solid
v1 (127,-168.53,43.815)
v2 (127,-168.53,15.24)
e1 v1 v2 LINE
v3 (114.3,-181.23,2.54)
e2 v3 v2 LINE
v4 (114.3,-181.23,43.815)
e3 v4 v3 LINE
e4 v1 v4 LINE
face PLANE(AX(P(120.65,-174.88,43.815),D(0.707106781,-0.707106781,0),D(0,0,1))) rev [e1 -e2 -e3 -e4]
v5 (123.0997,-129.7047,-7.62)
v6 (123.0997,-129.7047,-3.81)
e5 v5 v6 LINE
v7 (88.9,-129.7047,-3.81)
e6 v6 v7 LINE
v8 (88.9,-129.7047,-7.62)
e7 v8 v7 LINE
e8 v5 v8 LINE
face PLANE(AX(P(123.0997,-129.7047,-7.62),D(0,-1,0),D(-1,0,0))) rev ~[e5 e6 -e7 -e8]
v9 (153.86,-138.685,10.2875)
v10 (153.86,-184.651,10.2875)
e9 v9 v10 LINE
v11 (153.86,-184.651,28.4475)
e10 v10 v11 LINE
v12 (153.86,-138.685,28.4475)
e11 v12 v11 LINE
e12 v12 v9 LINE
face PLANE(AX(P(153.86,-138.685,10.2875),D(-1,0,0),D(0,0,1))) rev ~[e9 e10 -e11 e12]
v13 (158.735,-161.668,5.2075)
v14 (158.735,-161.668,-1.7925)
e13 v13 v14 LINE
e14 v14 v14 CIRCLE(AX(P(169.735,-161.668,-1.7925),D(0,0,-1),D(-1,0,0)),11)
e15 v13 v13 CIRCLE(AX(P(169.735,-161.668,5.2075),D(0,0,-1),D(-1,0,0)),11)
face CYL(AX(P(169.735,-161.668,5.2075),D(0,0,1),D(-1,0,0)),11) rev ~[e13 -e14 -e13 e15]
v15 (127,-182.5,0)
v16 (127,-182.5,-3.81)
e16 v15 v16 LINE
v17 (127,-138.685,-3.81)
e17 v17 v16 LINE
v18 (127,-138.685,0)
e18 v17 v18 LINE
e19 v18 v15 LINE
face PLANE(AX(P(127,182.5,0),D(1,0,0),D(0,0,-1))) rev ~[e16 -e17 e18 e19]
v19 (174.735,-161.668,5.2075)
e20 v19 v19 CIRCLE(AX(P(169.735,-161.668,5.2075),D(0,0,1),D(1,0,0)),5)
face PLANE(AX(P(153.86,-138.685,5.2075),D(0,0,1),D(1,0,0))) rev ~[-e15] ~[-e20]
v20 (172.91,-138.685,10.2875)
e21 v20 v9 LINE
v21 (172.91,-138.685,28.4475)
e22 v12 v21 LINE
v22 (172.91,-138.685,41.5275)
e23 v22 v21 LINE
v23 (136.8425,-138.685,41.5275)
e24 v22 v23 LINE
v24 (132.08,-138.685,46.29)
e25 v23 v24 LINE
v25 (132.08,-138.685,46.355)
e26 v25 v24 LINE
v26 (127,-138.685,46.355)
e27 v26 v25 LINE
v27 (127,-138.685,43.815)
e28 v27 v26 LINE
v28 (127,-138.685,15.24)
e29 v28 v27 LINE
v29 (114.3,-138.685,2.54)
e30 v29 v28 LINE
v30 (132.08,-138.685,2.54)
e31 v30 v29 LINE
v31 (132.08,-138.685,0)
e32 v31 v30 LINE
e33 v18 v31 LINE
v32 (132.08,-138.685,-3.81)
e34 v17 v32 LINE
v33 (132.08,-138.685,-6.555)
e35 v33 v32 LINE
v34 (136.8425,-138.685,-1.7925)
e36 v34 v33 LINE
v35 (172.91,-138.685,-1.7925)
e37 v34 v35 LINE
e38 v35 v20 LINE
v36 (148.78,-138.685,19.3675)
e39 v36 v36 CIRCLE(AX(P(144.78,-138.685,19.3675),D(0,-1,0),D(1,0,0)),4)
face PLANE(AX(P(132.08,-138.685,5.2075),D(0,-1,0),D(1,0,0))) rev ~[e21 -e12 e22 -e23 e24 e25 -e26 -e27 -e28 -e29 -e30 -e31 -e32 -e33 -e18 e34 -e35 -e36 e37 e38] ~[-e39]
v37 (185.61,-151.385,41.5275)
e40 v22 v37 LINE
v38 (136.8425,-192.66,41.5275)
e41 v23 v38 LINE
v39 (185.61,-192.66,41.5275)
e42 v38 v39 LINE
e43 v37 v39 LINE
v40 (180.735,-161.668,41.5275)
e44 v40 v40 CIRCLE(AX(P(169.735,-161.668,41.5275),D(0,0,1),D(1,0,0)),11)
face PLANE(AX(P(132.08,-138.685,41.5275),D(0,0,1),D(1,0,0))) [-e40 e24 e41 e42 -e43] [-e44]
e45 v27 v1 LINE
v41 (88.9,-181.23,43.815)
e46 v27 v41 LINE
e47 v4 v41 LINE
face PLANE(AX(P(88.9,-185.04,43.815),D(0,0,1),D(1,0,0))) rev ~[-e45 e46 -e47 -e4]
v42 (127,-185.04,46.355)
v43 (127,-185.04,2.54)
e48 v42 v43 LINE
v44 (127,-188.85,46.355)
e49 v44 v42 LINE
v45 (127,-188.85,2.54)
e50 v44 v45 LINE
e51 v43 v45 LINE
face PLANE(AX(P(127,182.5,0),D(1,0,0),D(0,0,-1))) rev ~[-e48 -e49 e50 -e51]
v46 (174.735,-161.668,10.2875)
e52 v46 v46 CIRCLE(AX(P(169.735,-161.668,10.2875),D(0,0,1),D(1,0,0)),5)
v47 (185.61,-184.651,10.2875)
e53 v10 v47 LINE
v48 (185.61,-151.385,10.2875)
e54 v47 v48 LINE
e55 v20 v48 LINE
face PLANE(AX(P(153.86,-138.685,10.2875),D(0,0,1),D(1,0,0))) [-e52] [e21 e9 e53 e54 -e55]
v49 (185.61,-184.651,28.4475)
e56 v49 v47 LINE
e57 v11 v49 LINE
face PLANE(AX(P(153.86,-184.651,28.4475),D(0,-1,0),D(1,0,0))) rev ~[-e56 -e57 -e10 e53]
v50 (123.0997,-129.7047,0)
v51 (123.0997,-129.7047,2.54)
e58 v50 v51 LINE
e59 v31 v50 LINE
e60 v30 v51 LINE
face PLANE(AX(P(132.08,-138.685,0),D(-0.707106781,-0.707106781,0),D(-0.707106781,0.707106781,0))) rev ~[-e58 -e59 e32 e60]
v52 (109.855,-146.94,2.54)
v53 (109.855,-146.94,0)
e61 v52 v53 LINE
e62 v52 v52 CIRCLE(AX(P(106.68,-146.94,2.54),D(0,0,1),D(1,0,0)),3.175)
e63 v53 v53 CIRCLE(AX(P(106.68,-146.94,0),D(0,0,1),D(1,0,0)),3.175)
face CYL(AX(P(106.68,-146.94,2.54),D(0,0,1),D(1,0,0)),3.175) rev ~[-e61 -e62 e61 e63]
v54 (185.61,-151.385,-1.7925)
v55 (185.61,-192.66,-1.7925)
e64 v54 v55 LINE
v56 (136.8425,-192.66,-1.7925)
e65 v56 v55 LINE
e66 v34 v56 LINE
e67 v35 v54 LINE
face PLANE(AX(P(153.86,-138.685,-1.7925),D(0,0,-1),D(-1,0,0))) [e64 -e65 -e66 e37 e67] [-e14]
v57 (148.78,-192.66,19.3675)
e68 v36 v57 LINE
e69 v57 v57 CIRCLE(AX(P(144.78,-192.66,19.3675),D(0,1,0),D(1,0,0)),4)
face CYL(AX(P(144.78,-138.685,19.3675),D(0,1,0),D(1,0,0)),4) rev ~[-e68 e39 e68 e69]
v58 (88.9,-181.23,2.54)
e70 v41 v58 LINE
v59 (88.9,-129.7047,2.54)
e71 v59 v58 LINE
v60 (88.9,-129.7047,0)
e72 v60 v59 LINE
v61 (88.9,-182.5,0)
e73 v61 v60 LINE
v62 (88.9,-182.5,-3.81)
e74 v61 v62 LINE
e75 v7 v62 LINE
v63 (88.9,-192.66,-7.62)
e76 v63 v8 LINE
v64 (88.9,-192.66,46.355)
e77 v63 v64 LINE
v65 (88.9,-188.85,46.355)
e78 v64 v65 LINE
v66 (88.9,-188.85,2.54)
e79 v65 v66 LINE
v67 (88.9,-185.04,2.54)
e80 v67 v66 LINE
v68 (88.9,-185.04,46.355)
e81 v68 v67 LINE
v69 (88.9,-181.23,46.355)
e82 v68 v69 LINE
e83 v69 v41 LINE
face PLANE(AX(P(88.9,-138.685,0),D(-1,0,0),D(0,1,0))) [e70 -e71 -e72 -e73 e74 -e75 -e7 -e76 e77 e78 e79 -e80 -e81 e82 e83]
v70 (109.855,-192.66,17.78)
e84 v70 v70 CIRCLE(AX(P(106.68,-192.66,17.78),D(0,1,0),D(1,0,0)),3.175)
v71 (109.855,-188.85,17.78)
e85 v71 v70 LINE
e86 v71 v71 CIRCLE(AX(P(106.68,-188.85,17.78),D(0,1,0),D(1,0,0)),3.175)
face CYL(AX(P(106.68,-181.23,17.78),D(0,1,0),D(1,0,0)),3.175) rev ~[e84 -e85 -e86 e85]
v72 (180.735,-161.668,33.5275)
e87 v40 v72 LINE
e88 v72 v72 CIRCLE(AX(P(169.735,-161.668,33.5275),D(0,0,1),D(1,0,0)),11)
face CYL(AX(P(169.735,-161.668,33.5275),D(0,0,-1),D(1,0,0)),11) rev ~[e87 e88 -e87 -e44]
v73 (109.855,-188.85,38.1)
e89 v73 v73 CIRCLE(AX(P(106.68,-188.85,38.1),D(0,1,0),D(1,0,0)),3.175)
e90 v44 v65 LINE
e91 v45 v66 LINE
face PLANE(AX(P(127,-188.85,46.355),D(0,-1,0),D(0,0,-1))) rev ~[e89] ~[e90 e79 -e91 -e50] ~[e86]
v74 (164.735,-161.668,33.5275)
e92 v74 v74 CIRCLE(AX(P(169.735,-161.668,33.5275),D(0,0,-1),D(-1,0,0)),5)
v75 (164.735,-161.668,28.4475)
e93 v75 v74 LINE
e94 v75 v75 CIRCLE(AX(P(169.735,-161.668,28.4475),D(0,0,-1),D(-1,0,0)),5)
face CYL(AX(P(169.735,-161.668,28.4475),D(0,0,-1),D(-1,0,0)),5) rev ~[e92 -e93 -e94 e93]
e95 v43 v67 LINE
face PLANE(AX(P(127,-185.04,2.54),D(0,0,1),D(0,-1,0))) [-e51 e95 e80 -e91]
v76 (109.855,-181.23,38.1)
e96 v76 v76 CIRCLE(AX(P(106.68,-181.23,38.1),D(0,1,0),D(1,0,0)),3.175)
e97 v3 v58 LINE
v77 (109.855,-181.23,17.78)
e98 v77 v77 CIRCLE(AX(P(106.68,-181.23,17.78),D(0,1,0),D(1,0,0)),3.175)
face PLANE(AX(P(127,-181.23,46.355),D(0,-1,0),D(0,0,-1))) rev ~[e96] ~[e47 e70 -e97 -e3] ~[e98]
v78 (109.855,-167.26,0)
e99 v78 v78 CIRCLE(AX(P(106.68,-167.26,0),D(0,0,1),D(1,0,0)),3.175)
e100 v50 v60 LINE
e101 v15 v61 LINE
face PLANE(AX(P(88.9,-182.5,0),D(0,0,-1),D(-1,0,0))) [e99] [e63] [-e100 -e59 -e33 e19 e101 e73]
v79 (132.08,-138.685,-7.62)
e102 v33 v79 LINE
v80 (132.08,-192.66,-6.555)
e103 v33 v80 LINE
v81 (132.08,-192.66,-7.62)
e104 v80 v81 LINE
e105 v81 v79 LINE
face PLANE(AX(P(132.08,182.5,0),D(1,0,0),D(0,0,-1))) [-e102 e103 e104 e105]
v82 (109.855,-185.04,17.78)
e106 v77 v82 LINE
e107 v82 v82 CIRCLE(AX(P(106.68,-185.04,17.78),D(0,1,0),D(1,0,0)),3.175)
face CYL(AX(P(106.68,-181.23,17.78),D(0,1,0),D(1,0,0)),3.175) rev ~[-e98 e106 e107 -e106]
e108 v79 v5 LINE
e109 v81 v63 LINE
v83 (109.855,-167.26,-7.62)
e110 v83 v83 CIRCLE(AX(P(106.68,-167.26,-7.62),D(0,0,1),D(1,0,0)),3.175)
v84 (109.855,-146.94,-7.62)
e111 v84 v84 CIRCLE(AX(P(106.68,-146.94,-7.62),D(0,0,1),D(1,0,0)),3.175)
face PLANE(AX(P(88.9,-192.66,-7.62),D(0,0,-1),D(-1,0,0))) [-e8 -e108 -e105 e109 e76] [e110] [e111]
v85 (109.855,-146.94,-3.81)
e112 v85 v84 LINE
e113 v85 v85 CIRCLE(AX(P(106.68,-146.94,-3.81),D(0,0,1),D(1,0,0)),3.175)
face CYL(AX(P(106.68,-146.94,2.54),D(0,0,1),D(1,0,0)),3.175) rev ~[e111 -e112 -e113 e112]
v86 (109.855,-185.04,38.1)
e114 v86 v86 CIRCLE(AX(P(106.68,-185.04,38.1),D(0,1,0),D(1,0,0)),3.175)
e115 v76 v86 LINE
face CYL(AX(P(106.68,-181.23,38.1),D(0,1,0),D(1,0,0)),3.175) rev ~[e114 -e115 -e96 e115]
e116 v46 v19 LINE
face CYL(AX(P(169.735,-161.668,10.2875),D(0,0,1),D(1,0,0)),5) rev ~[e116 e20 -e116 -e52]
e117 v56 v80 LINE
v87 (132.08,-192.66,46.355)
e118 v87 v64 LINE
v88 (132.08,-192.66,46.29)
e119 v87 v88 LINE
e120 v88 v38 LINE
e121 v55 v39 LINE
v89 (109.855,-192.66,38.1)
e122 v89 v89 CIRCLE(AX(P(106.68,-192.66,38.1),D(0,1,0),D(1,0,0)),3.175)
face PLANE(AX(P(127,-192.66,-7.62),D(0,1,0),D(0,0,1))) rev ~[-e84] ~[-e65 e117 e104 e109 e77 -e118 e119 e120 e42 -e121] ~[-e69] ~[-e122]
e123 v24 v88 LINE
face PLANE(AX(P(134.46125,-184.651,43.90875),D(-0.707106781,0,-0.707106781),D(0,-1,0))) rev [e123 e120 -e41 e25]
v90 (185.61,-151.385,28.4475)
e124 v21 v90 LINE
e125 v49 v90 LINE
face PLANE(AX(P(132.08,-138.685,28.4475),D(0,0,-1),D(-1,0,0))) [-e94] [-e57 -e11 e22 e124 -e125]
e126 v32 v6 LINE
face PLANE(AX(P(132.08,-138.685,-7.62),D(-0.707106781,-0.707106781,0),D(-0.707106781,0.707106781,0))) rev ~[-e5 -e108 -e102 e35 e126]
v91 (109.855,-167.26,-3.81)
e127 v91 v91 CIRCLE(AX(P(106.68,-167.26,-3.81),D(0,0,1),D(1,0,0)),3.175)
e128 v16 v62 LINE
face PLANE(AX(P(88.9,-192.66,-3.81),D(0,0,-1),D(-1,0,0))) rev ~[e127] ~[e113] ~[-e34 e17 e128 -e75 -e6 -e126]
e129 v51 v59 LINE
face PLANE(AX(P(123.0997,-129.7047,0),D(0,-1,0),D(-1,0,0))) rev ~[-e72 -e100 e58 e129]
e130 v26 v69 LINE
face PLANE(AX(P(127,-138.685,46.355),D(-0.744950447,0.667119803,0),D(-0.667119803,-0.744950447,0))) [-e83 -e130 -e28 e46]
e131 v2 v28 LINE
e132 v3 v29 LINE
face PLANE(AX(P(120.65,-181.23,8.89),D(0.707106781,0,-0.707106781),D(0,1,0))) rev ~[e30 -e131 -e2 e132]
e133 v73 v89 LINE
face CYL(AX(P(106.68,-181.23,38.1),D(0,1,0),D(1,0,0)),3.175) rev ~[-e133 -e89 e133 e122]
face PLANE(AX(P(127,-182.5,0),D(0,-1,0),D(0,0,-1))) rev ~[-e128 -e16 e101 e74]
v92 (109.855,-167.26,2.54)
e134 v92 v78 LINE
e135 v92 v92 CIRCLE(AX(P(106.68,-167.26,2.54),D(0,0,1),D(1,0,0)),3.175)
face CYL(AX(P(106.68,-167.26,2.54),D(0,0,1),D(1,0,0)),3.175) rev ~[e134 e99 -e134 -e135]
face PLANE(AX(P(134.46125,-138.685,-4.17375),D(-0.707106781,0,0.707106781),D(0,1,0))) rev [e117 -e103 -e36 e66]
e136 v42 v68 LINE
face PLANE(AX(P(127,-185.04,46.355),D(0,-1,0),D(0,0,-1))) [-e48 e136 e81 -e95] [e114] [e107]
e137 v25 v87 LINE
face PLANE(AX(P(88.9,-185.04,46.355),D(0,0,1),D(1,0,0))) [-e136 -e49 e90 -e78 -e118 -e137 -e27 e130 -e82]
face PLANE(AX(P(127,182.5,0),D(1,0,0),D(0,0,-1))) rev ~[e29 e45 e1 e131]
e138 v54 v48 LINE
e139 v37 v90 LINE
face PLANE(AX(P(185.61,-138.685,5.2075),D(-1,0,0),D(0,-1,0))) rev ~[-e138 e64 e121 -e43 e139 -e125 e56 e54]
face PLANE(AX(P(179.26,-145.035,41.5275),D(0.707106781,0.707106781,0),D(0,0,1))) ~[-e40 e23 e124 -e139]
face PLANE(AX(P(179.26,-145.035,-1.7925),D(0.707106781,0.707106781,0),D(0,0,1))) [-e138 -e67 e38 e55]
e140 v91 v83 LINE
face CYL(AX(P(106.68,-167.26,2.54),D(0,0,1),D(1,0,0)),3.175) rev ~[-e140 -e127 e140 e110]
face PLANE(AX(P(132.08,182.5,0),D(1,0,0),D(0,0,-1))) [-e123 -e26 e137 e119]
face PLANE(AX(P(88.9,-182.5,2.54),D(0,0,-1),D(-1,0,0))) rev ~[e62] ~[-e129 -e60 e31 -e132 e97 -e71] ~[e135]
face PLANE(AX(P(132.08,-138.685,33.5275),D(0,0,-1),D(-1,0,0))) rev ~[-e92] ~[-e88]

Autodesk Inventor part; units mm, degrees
ref_plane "YZ Plane" through (0, 0, 0) normal (1, 0, 0) x (0, 1, 0)
ref_plane "XZ Plane" through (0, 0, 0) normal (0, 1, 0) x (-1, 0, 0)
ref_plane "Work Plane1" through (0, 0, 0) normal (0, 0, 1) x (1, 0, 0)
ref_plane "Work Plane2" through (127, 182.5, 0) normal (1, 0, 0) x (0, 1, 0)
sketch "Sketch1" plane through (127, 182.5, 0) normal (1, 0, 0) x (0, 1, 0)
  line L0 (0, -3.81) -> (-365, -3.81) projected
  line L1 (0, 0) -> (0, -3.81) projected
  line L2 (0, 0) -> (-365, 0) projected
  line L3 (-365, 0) -> (-365, -3.81) projected
  line L4 (-371.35, 459.74) -> (-371.35, 2.54) projected
  line L5 (-367.54, 2.54) -> (-371.35, 2.54) projected
  line L6 (-367.54, 459.74) -> (-367.54, 2.54) projected
  line L7 (-367.54, 459.74) -> (-371.35, 459.74) projected
  line L8 (-367.54, 46.355) -> (-363.73, 46.355)
  line L9 (-321.185, -3.81) -> (-321.185, -7.62)
  line L10 (-321.185, -7.62) -> (-375.16, -7.62)
  line L11 (-375.16, -7.62) -> (-375.16, 46.355)
  line L12 (-363.73, 46.355) -> (-363.73, 2.54)
  line L13 (-363.73, 2.54) -> (-321.185, 2.54)
  line L14 (-321.185, 2.54) -> (-321.185, 0)
  line L15 (-321.185, 0) -> (-365, 0)
  line L16 (-365, 0) -> (-365, -3.81)
  line L17 (-365, -3.81) -> (-321.185, -3.81)
  line L18 (-371.35, 46.355) -> (-371.35, 41.275)
  line L19 (-371.35, 41.275) -> (-371.35, 2.54)
  line L20 (-371.35, 2.54) -> (-367.54, 2.54)
  line L21 (-367.54, 2.54) -> (-367.54, 46.355)
  line L22 (-375.16, 46.355) -> (-371.35, 46.355)
  line L23 (-367.54, 46.355) -> (-363.73, 46.355)
  point P0 (-182.5, 0)
  point P1 (-326.265, 0)
  point P2 (-326.265, -3.81)
  point P3 (-367.54, 41.275)
  dimension "d2" = 3.81
  dimension "d4" = 3.81
extrude "Extrusion1" add sketch "Sketch1" against normal blind 38.1 contours L9 L10 L11 L22 L4 L5 L6 L8 L12 L13 L14 L2 L3 L0
sketch "Sketch2" plane through (127, 182.5, 0) normal (1, 0, 0) x (0, 0, -1)
  line L0 (3.81, -365) -> (0, -365) projected
  line L1 (0, -365) -> (0, -321.185) projected
  line L2 (0, -321.185) -> (-2.54, -321.185) projected
  line L3 (-2.54, -321.185) -> (-2.54, -363.73) projected
  line L4 (-2.54, -363.73) -> (-46.355, -363.73) projected
  line L5 (-46.355, -363.73) -> (-46.355, -367.54) projected
  line L6 (-46.355, -367.54) -> (-2.54, -367.54) projected
  line L7 (-2.54, -367.54) -> (-2.54, -371.35) projected
  line L8 (-2.54, -371.35) -> (-46.355, -371.35) projected
  line L9 (-46.355, -371.35) -> (-46.355, -375.16) projected
  line L10 (-46.355, -375.16) -> (7.62, -375.16) projected
  line L11 (7.62, -375.16) -> (7.62, -321.185) projected
  line L12 (7.62, -321.185) -> (3.81, -321.185) projected
  line L13 (3.81, -321.185) -> (3.81, -365) projected
  line L14 (3.81, -321.185) -> (7.62, -321.185) projected
  line L15 (7.62, -375.16) -> (-46.355, -375.16) projected
  line L16 (7.62, -321.185) -> (-46.355, -321.185)
  line L17 (-46.355, -321.185) -> (-46.355, -375.16)
  line L18 (-46.355, -375.16) -> (7.62, -375.16)
  line L19 (7.62, -375.16) -> (7.62, -321.185)
  point P0 (0, -182.5)
extrude "Extrusion2" add sketch "Sketch2" along normal blind 5.08
sketch "Sketch3" plane through (88.9, -138.685, -3.81) normal (0, 1, 0) x (1, 0, 0)
  line L0 (38.1, -3.81) -> (0, -3.81) projected
  line L1 (0, -6.35) -> (0, -3.81) projected
  line L2 (38.1, -6.35) -> (0, -6.35) projected
  line L3 (38.1, -6.35) -> (38.1, -50.165) projected
  line L4 (38.1, -50.165) -> (43.18, -50.165) projected
  line L5 (43.18, 3.81) -> (43.18, -50.165) projected
  line L6 (0, 3.81) -> (43.18, 3.81) projected
  line L7 (0, 0) -> (0, 3.81) projected
  line L8 (38.1, 0) -> (0, 0) projected
  line L9 (38.1, 0) -> (38.1, -3.81) projected
  line L10 (43.18, -50.165) -> (43.18, 3.81) projected
  line L11 (43.18, -23.1775) -> (55.88, -23.1775)
  circle A0 centre (55.88, -23.1775) radius 4
  line L12 (55.88, -27.1775) -> (55.88, -32.2575)
  line L13 (55.88, -19.1775) -> (55.88, -14.0975)
  line L14 (59.88, -23.1775) -> (64.96, -23.1775)
  line L15 (43.18, -14.0975) -> (64.96, -14.0975)
  line L16 (64.96, -14.0975) -> (64.96, -32.2575)
  line L17 (64.96, -32.2575) -> (43.18, -32.2575)
  line L18 (43.18, -32.2575) -> (43.18, -14.0975)
  point P0 (-88.9, -3.81)
  dimension "d9" = 12.7
  dimension "d10" = 8
  dimension "d11" = 5.08
  dimension "d12" = 5.08
  dimension "d13" = 5.08
extrude "Extrusion3" add sketch "Sketch3" against normal up to surface (53.975 mm away) contours L15 L13 A0 L11 L5 | L5 L11 A0 L12 L17 | L15 L16 L14 A0 L13 | L12 A0 L14 L16 L17
sketch "Sketch4" plane through (132.08, -138.685, 28.4475) normal (0, 0, 1) x (1, 0, 0)
  line L0 (0, -53.975) -> (21.78, -53.975) projected
  line L1 (21.78, 0) -> (21.78, -53.975) projected
  line L2 (0, 0) -> (21.78, 0) projected
  line L3 (0, -53.975) -> (0, 0) projected
  line L4 (0, -53.975) -> (0, 0) projected
  line L5 (21.78, 0) -> (21.78, -53.975) projected
  line L6 (0, -45.966) -> (21.78, -45.966)
  line L7 (21.78, -45.966) -> (21.78, -26.916)
  line L8 (21.78, -26.916) -> (0, -26.916)
  line L9 (0, -26.916) -> (0, -45.966)
  line L10 (21.78, -45.966) -> (53.53, -45.966)
  line L11 (53.53, -45.966) -> (53.53, 0)
  line L12 (53.53, 0) -> (21.78, 0)
  line L13 (21.78, 0) -> (21.78, -45.966)
  circle A0 centre (37.655, -22.983) radius 11
  point P0 (-132.08, 138.685)
  dimension "d16" = 19.05
  dimension "d17" = 31.75
  dimension "d18" = 22
extrude "Extrusion4" add sketch "Sketch4" along normal blind 5.08 contours L3 L8 L1 L6 | L1 L12 L11 L10 | L3 L2 L1 L8
sketch "Sketch5" plane through (153.86, -138.685, 10.2875) normal (0, 0, -1) x (-1, 0, 0)
  circle A0 centre (-15.875, -22.983) radius 11 projected
  line L0 (21.78, -45.966) -> (-31.75, -45.966) projected
  line L1 (-31.75, -45.966) -> (-31.75, 0) projected
  line L2 (-31.75, 0) -> (21.78, 0) projected
  line L3 (21.78, -45.966) -> (21.78, 0) projected
  point P0 (153.86, 138.685)
extrude "Extrusion5" add sketch "Sketch5" along normal blind 5.08
sketch "Sketch6" plane through (132.08, -138.685, 33.5275) normal (0, 0, 1) x (1, 0, 0)
  circle A0 centre (37.655, -22.983) radius 11 projected
  line L0 (0, -45.966) -> (53.53, -45.966) projected
  line L1 (53.53, -45.966) -> (53.53, 0) projected
  line L2 (53.53, 0) -> (0, 0) projected
  line L3 (0, -45.966) -> (0, 0) projected
  point P0 (-132.08, 138.685)
extrude "Extrusion6" add sketch "Sketch6" along normal blind 8
sketch "Sketch7" plane through (132.08, -138.685, 28.4475) normal (0, 0, -1) x (-1, 0, 0)
  line L0 (-53.53, -45.966) -> (-53.53, 0) projected
  circle A0 centre (-37.655, -22.983) radius 11 projected
  line L1 (0, -45.966) -> (-53.53, -45.966) projected
  line L2 (-53.53, -45.966) -> (-53.53, 0) projected
  line L3 (-53.53, 0) -> (0, 0) projected
  line L4 (0, -45.966) -> (0, 0) projected
  circle A1 centre (-37.655, -22.983) radius 5
  point P0 (132.08, 138.685)
  dimension "d25" = 10
extrude "Extrusion7" add sketch "Sketch7" against normal blind 5.08 contours A0
chamfer "Chamfer1" distance 4.7625 angle 45 1 edges at (132.08, -161.668, 41.5275)
sketch "Sketch8" plane through (153.86, -138.685, 10.2875) normal (0, 0, 1) x (1, 0, 0)
  circle A0 centre (15.875, -22.983) radius 5 projected
  circle A1 centre (15.875, -22.983) radius 11 projected
  point P0 (-153.86, 138.685)
extrude "Extrusion8" add sketch "Sketch8" against normal blind 5.08
sketch "Sketch9" plane through (153.86, -138.685, 5.2075) normal (0, 0, -1) x (-1, 0, 0)
  circle A0 centre (-15.875, -22.983) radius 5 projected
  line L0 (-31.75, -45.966) -> (21.78, -45.966) projected
  line L1 (21.78, 0) -> (21.78, -45.966) projected
  line L2 (21.78, 0) -> (-31.75, 0) projected
  line L3 (-31.75, 0) -> (-31.75, -45.966) projected
  circle A1 centre (-15.875, -22.983) radius 11 projected
  point P0 (153.86, 138.685)
extrude "Extrusion9" add sketch "Sketch9" along normal blind 7 contours L3 L2 L1 L0
chamfer "Chamfer2" distance 4.7625 angle 45 1 edges at (132.08, -161.668, -1.7925)
sketch "Sketch10" plane through (153.86, -184.651, 28.4475) normal (0, -1, 0) x (1, 0, 0)
  line L0 (4.875, -23.24) -> (26.875, -23.24) projected
  line L1 (-21.78, -18.16) -> (0, -18.16) projected
  line L2 (-21.78, -35.0025) -> (-21.78, -18.16) projected
  line L3 (-17.0175, -30.24) -> (-21.78, -35.0025) projected
  line L4 (31.75, -30.24) -> (-17.0175, -30.24) projected
  line L5 (31.75, -18.16) -> (31.75, -30.24) projected
  line L6 (0, -18.16) -> (31.75, -18.16) projected
  line L7 (4.875, 5.08) -> (26.875, 5.08) projected
  line L8 (0, 0) -> (-21.78, 0) projected
  line L9 (0, 0) -> (31.75, 0) projected
  line L10 (31.75, 0) -> (31.75, 13.08) projected
  line L11 (-17.0175, 13.08) -> (31.75, 13.08) projected
  line L12 (-21.78, 17.8425) -> (-17.0175, 13.08) projected
  line L13 (-21.78, 0) -> (-21.78, 17.8425) projected
  line L14 (0, 0) -> (31.75, 0) projected
  line L15 (31.75, -30.24) -> (0, -30.24)
  line L16 (0, -30.24) -> (0, 0)
  line L17 (0, 0) -> (31.75, 0)
  line L18 (31.75, 0) -> (31.75, -30.24)
  point P0 (-153.86, -28.4475)
extrude "Extrusion10" add sketch "Sketch10" along normal up to surface (8.009 mm away)
sketch "Sketch11" plane through (88.9, -185.04, 46.355) normal (0, 0, 1) x (1, 0, 0)
  line L0 (38.1, 3.81) -> (0, 3.81) projected
  line L1 (0, 0) -> (0, 3.81) projected
  line L2 (38.1, 0) -> (0, 0) projected
  line L3 (38.1, 0) -> (38.1, -3.81) projected
  line L4 (38.1, -3.81) -> (0, -3.81) projected
  line L5 (0, -7.62) -> (0, -3.81) projected
  line L6 (0, -7.62) -> (43.18, -7.62) projected
  line L7 (43.18, 46.355) -> (43.18, -7.62) projected
  line L8 (38.1, 46.355) -> (43.18, 46.355) projected
  line L9 (38.1, 46.355) -> (38.1, 3.81) projected
  line L10 (0, 0) -> (0, 3.81) projected
  line L11 (38.1, 46.355) -> (0, 3.81)
  line L12 (38.1, 3.81) -> (0, 3.81) projected
  line L13 (0, 3.81) -> (38.1, 3.81)
  line L14 (38.1, 3.81) -> (38.1, 46.355)
  point P0 (-88.9, 185.04)
extrude "Extrusion11" add sketch "Sketch11" against normal blind 2.54 contours L0 L11 L9
sketch "Sketch12" plane through (88.9, -181.23, 2.54) normal (0, 0, 1) x (1, 0, 0)
  circle A0 centre (17.78, 13.97) radius 3.175 projected
  circle A1 centre (17.78, 34.29) radius 3.175 projected
  circle A2 centre (17.78, 13.97) radius 3.175 projected
  point P0 (-88.9, 181.23)
extrude "Extrusion12" cut sketch "Sketch12" against normal blind 45.4025
sketch "Sketch13" plane through (88.9, -181.23, 2.54) normal (0, 1, 0) x (1, 0, 0)
  circle A0 centre (17.78, -15.24) radius 3.175 projected
  circle A1 centre (17.78, -35.56) radius 3.175 projected
  point P0 (-88.9, 2.54)
extrude "Extrusion13" cut sketch "Sketch13" along normal mid plane 45.4025
chamfer "Chamfer3" distance 12.7 angle 45 2 edges at (127, -159.9575, 2.54) (127, -181.23, 23.1775)
chamfer "Chamfer4" distance 12.7 angle 45 2 edges at (185.61, -138.685, 4.2475) (185.61, -138.685, 34.9875)
sketch "Sketch14" plane through (88.9, -192.66, -7.62) normal (0, 0, -1) x (-1, 0, 0)
  circle A0 centre (-17.78, 25.4) radius 3.175 projected
  circle A1 centre (-17.78, 45.72) radius 3.175 projected
  line L0 (0, 0) -> (-43.18, 0) projected
  line L1 (0, 53.975) -> (0, 0) projected
  line L2 (0, 53.975) -> (-43.18, 53.975) projected
  line L3 (-43.18, 0) -> (-43.18, 53.975) projected
  line L4 (-43.18, 53.975) -> (-34.1997, 62.9553)
  line L5 (-43.18, 53.975) -> (-30.48, 53.975) construction
  line L6 (-34.1997, 62.9553) -> (0, 62.9553)
  line L7 (-25.4, 53.975) -> (0, 53.975) projected
  line L8 (0, 62.9553) -> (0, 53.975)
  line L9 (-47.9425, 53.975) -> (-43.18, 53.975) projected
  line L10 (-43.18, 53.975) -> (0, 53.975)
  point P0 (88.9, 192.66)
  dimension "d52" = 12.7
  dimension "d53" = 45
ref_plane "Work Plane3" through (-127, -182.5, -3.81) normal (0, 0, -1) x (0, 1, 0)
extrude "Extrusion14" add sketch "Sketch14" against normal up to surface (3.81 mm away) contours L2 L4 L6 L8
sketch "Sketch15" plane through (88.9, -182.5, 0) normal (0, 0, -1) x (-1, 0, 0)
  line L0 (-43.18, 43.815) -> (-34.1997, 52.7953) projected
  line L1 (-34.1997, 52.7953) -> (0, 52.7953) projected
  line L2 (-25.4, 43.815) -> (0, 43.815) projected
  line L3 (-38.1, 43.815) -> (-25.4, 43.815) projected
  line L4 (-38.1, 43.815) -> (-43.18, 43.815) projected
  line L5 (0, 0) -> (0, 52.7953) projected
  point P0 (88.9, 182.5)
extrude "Extrusion15" add sketch "Sketch15" against normal up to surface (2.54 mm away)
properties part number "Ystartnew"
